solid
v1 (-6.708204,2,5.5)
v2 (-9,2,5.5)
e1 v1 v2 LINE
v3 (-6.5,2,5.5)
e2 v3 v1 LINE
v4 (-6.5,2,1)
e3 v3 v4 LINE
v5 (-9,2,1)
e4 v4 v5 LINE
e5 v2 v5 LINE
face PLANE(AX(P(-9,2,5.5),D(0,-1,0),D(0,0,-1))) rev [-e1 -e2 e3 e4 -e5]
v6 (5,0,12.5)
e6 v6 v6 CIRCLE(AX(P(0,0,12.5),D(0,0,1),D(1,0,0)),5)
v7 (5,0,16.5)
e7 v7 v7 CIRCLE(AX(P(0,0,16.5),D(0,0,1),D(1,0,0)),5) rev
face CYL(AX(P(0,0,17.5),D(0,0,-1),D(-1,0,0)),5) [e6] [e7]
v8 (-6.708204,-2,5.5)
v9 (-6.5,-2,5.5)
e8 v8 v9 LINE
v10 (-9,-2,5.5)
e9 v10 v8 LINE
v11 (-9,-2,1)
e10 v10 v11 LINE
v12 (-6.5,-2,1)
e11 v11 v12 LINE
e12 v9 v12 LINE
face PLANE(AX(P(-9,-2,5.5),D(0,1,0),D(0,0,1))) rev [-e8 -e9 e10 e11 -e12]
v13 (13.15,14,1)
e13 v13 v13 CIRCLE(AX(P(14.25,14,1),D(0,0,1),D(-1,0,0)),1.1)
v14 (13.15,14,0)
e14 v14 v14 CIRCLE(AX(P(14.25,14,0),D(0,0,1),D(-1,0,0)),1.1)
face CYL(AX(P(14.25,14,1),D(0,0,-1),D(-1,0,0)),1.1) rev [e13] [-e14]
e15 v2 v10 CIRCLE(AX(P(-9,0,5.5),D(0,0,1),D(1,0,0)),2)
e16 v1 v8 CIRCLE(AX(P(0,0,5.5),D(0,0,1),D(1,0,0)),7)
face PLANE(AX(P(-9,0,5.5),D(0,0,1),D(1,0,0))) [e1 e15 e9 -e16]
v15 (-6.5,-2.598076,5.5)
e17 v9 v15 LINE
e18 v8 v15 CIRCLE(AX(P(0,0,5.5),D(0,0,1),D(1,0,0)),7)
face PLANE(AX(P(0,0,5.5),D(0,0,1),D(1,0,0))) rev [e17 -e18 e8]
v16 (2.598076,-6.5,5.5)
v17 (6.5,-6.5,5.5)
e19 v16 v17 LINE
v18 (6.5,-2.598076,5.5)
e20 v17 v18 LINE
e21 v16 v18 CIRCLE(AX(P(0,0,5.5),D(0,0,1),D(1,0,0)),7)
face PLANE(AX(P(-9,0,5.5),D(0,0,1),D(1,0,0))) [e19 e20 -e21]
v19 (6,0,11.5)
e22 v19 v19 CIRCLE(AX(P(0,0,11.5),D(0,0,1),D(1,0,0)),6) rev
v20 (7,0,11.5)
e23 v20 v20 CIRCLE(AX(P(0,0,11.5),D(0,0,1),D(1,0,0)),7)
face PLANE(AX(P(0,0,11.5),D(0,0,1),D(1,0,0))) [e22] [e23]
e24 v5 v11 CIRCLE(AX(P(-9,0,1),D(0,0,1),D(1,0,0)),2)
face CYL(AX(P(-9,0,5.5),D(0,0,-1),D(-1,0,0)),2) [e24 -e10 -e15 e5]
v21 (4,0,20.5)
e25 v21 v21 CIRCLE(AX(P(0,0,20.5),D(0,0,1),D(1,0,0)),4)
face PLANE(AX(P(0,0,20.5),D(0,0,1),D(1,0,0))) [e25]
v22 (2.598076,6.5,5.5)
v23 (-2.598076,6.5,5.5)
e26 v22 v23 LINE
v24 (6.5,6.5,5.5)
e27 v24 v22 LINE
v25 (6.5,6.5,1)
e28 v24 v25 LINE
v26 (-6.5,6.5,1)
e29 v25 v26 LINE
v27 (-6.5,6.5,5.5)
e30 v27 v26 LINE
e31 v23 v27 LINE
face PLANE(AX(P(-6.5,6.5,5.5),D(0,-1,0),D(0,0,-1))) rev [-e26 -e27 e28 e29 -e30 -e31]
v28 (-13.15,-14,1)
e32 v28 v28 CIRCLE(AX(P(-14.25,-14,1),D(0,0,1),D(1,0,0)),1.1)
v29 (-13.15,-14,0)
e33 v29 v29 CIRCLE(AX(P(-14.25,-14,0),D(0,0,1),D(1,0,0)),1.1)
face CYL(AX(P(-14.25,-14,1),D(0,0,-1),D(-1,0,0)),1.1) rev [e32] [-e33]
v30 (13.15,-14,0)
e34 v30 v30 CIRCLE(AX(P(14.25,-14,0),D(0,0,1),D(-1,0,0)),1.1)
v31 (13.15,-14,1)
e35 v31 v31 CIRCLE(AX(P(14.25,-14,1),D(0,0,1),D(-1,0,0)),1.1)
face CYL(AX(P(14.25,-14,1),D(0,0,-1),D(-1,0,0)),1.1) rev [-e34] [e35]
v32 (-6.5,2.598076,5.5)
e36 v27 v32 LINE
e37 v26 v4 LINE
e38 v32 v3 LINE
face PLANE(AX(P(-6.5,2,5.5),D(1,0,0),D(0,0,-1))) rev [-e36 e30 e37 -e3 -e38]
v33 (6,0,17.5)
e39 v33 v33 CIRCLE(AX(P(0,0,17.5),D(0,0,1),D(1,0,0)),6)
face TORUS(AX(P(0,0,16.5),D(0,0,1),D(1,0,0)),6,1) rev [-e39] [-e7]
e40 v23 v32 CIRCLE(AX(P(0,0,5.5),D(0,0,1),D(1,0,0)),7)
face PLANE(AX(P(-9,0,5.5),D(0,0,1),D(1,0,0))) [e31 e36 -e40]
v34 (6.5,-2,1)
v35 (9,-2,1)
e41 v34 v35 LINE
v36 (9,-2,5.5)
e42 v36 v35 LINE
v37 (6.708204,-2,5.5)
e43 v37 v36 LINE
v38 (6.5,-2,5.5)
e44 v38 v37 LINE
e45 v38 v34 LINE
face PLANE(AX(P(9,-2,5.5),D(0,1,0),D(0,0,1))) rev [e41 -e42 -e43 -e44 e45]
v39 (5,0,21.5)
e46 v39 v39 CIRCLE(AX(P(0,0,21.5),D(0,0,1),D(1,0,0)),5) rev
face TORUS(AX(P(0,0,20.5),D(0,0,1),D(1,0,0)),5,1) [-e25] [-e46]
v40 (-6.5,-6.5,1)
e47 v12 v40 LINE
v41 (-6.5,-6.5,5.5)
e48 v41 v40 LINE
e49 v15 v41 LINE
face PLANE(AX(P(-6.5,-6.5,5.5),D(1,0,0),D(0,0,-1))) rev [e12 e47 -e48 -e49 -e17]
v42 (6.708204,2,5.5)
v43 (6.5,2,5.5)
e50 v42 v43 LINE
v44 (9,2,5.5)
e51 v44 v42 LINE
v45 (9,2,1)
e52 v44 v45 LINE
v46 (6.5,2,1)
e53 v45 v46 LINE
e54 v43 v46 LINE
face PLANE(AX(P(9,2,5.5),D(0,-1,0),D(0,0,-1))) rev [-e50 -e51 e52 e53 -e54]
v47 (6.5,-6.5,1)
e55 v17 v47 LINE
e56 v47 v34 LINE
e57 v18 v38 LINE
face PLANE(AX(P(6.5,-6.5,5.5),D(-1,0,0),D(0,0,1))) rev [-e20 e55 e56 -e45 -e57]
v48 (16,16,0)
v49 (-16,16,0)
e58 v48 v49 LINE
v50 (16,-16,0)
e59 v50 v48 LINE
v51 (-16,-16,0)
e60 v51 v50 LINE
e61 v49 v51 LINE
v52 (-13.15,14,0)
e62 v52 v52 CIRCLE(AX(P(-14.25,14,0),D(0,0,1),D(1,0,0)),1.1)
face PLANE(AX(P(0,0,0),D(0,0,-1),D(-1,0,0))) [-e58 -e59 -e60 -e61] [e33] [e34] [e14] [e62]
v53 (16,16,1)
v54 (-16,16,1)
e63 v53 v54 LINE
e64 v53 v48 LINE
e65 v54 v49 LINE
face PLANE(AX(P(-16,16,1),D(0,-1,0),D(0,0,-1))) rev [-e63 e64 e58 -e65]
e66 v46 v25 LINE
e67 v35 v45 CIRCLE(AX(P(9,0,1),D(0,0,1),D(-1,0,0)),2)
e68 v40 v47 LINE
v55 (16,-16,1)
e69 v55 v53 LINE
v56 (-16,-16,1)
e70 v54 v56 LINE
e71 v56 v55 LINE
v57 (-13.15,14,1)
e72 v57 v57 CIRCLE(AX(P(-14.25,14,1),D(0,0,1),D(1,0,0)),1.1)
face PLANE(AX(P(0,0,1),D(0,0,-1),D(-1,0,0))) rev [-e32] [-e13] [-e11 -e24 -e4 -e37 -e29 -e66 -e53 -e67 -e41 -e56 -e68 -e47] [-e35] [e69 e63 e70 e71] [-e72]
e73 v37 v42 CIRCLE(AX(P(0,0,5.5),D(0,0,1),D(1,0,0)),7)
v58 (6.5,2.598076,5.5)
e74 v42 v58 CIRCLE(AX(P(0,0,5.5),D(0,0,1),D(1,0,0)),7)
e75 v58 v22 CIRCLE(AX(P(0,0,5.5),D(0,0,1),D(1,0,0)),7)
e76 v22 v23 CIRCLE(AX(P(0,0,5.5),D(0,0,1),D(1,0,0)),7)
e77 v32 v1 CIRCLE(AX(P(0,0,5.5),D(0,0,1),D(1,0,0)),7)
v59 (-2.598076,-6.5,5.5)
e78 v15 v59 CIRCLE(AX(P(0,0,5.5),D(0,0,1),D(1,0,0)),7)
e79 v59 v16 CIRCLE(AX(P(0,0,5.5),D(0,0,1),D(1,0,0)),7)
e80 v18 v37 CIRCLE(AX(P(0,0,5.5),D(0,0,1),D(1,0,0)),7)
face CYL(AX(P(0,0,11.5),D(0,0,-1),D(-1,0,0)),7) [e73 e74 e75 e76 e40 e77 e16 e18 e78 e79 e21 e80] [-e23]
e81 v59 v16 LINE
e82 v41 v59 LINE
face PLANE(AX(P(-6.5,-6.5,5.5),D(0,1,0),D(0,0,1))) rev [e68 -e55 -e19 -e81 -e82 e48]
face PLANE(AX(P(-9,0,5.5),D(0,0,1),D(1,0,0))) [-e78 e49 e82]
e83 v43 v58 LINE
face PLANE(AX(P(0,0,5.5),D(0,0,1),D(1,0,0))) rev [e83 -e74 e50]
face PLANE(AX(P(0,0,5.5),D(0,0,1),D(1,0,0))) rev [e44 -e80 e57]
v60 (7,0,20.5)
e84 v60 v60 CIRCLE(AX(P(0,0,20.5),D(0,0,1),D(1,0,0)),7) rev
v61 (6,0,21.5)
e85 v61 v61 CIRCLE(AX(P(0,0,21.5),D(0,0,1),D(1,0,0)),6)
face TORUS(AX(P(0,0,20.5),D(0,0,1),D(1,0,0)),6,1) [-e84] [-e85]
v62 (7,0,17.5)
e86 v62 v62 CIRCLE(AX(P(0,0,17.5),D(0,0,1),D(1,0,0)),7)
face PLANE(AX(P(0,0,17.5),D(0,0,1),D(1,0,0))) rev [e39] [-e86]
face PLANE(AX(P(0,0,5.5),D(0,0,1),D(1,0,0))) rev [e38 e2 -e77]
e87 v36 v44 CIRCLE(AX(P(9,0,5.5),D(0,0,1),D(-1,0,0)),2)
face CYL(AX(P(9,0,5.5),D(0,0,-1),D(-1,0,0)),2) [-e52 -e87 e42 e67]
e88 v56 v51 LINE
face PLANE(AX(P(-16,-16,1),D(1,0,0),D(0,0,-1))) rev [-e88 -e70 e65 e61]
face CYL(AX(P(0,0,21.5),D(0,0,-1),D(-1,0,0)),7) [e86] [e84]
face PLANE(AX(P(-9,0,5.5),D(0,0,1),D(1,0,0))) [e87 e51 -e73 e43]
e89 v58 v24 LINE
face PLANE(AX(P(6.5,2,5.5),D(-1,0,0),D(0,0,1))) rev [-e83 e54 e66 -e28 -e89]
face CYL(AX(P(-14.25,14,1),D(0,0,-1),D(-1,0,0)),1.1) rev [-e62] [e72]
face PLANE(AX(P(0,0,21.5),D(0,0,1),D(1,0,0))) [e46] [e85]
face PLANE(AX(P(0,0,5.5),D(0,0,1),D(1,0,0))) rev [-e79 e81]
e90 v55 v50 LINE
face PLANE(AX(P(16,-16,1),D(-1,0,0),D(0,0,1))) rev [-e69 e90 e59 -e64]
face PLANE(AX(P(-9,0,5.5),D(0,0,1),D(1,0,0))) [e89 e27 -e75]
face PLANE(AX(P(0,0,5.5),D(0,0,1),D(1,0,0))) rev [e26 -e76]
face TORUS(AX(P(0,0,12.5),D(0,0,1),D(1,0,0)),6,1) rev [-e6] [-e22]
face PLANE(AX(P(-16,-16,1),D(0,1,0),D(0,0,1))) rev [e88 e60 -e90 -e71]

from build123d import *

# Parameters (mm, degrees)
SKETCH_2_W          = 32
SKETCH_2_H          = 32
SKETCH_2_R          = 1.1
EXTRUDE_1_DEPTH     = 1
EXTRUDE_2_DEPTH     = 4.5
SKETCH_4_R          = 7
EXTRUDE_3_DEPTH     = 6
SKETCH_5_R          = 5
EXTRUDE_4_DEPTH     = 6
SKETCH_6_R          = 7
EXTRUDE_5_DEPTH     = 4
SKETCH_9_R          = 4
CUT_EXTRUDE_2_DEPTH = 1
FILLET_2_R          = 1


with BuildPart() as part:
    # 草图2 → 凸台-拉伸1 (new body)
    with BuildSketch(Plane.XY):
        Rectangle(SKETCH_2_W, SKETCH_2_H)
        with Locations((-14.25, -14)):
            Circle(SKETCH_2_R, mode=Mode.SUBTRACT)
        with Locations((-14.25, 14)):
            Circle(SKETCH_2_R, mode=Mode.SUBTRACT)
        with Locations(Location((14.25, 14, 0), (0, 0, 180))):
            Circle(SKETCH_2_R, mode=Mode.SUBTRACT)
        with Locations(Location((14.25, -14, 0), (0, 0, 180))):
            Circle(SKETCH_2_R, mode=Mode.SUBTRACT)
    extrude(amount=EXTRUDE_1_DEPTH)

    # 草图3 → 凸台-拉伸2 (add)
    with BuildSketch(Plane.XY.offset(1)):
        with BuildLine():
            Line((-6.5, -6.5), (6.5, -6.5))
            Line((6.5, -6.5), (6.5, -2))
            Line((6.5, -2), (9, -2))
            ThreePointArc((9, -2), (11, 0), (9, 2))
            Line((9, 2), (6.5, 2))
            Line((6.5, 2), (6.5, 6.5))
            Line((6.5, 6.5), (-6.5, 6.5))
            Line((-6.5, 6.5), (-6.5, 2))
            Line((-6.5, 2), (-9, 2))
            ThreePointArc((-9, 2), (-11, 0), (-9, -2))
            Line((-9, -2), (-6.5, -2))
            Line((-6.5, -2), (-6.5, -6.5))
        make_face()
    extrude(amount=EXTRUDE_2_DEPTH)

    # 草图4 → 凸台-拉伸3 (add)
    with BuildSketch(Plane.XY.offset(5.5)):
        with Locations(Location((0, 0, 0), (0, 0, 196.601549599))):
            Circle(SKETCH_4_R)
    extrude(amount=EXTRUDE_3_DEPTH)

    # 草图5 → 凸台-拉伸4 (add)
    with BuildSketch(Plane.XY.offset(11.5)):
        Circle(SKETCH_5_R)
    extrude(amount=EXTRUDE_4_DEPTH)

    # 草图6 → 凸台-拉伸5 (add)
    with BuildSketch(Plane.XY.offset(17.5)):
        with Locations(Location((0, 0, 0), (0, 0, 196.601549599))):
            Circle(SKETCH_6_R)
    extrude(amount=EXTRUDE_5_DEPTH)

    # 草图9 → 切除-拉伸2 (cut)
    with BuildSketch(Plane.XY.offset(21.5)):
        Circle(SKETCH_9_R)
    extrude(amount=-CUT_EXTRUDE_2_DEPTH, mode=Mode.SUBTRACT)

    # 圆角2
    fillet_2_edges = [part.edges().sort_by_distance(p)[0] for p in [
        (-4, 0, 21.5),
        (-5, 0, 11.5),
        (-5, 0, 17.5),
        (6.708203933, 2, 21.5),
    ]]
    fillet(fillet_2_edges, radius=FILLET_2_R - 0.0001)  # a hair under: the kernel refuses the full size


solid = part.part
